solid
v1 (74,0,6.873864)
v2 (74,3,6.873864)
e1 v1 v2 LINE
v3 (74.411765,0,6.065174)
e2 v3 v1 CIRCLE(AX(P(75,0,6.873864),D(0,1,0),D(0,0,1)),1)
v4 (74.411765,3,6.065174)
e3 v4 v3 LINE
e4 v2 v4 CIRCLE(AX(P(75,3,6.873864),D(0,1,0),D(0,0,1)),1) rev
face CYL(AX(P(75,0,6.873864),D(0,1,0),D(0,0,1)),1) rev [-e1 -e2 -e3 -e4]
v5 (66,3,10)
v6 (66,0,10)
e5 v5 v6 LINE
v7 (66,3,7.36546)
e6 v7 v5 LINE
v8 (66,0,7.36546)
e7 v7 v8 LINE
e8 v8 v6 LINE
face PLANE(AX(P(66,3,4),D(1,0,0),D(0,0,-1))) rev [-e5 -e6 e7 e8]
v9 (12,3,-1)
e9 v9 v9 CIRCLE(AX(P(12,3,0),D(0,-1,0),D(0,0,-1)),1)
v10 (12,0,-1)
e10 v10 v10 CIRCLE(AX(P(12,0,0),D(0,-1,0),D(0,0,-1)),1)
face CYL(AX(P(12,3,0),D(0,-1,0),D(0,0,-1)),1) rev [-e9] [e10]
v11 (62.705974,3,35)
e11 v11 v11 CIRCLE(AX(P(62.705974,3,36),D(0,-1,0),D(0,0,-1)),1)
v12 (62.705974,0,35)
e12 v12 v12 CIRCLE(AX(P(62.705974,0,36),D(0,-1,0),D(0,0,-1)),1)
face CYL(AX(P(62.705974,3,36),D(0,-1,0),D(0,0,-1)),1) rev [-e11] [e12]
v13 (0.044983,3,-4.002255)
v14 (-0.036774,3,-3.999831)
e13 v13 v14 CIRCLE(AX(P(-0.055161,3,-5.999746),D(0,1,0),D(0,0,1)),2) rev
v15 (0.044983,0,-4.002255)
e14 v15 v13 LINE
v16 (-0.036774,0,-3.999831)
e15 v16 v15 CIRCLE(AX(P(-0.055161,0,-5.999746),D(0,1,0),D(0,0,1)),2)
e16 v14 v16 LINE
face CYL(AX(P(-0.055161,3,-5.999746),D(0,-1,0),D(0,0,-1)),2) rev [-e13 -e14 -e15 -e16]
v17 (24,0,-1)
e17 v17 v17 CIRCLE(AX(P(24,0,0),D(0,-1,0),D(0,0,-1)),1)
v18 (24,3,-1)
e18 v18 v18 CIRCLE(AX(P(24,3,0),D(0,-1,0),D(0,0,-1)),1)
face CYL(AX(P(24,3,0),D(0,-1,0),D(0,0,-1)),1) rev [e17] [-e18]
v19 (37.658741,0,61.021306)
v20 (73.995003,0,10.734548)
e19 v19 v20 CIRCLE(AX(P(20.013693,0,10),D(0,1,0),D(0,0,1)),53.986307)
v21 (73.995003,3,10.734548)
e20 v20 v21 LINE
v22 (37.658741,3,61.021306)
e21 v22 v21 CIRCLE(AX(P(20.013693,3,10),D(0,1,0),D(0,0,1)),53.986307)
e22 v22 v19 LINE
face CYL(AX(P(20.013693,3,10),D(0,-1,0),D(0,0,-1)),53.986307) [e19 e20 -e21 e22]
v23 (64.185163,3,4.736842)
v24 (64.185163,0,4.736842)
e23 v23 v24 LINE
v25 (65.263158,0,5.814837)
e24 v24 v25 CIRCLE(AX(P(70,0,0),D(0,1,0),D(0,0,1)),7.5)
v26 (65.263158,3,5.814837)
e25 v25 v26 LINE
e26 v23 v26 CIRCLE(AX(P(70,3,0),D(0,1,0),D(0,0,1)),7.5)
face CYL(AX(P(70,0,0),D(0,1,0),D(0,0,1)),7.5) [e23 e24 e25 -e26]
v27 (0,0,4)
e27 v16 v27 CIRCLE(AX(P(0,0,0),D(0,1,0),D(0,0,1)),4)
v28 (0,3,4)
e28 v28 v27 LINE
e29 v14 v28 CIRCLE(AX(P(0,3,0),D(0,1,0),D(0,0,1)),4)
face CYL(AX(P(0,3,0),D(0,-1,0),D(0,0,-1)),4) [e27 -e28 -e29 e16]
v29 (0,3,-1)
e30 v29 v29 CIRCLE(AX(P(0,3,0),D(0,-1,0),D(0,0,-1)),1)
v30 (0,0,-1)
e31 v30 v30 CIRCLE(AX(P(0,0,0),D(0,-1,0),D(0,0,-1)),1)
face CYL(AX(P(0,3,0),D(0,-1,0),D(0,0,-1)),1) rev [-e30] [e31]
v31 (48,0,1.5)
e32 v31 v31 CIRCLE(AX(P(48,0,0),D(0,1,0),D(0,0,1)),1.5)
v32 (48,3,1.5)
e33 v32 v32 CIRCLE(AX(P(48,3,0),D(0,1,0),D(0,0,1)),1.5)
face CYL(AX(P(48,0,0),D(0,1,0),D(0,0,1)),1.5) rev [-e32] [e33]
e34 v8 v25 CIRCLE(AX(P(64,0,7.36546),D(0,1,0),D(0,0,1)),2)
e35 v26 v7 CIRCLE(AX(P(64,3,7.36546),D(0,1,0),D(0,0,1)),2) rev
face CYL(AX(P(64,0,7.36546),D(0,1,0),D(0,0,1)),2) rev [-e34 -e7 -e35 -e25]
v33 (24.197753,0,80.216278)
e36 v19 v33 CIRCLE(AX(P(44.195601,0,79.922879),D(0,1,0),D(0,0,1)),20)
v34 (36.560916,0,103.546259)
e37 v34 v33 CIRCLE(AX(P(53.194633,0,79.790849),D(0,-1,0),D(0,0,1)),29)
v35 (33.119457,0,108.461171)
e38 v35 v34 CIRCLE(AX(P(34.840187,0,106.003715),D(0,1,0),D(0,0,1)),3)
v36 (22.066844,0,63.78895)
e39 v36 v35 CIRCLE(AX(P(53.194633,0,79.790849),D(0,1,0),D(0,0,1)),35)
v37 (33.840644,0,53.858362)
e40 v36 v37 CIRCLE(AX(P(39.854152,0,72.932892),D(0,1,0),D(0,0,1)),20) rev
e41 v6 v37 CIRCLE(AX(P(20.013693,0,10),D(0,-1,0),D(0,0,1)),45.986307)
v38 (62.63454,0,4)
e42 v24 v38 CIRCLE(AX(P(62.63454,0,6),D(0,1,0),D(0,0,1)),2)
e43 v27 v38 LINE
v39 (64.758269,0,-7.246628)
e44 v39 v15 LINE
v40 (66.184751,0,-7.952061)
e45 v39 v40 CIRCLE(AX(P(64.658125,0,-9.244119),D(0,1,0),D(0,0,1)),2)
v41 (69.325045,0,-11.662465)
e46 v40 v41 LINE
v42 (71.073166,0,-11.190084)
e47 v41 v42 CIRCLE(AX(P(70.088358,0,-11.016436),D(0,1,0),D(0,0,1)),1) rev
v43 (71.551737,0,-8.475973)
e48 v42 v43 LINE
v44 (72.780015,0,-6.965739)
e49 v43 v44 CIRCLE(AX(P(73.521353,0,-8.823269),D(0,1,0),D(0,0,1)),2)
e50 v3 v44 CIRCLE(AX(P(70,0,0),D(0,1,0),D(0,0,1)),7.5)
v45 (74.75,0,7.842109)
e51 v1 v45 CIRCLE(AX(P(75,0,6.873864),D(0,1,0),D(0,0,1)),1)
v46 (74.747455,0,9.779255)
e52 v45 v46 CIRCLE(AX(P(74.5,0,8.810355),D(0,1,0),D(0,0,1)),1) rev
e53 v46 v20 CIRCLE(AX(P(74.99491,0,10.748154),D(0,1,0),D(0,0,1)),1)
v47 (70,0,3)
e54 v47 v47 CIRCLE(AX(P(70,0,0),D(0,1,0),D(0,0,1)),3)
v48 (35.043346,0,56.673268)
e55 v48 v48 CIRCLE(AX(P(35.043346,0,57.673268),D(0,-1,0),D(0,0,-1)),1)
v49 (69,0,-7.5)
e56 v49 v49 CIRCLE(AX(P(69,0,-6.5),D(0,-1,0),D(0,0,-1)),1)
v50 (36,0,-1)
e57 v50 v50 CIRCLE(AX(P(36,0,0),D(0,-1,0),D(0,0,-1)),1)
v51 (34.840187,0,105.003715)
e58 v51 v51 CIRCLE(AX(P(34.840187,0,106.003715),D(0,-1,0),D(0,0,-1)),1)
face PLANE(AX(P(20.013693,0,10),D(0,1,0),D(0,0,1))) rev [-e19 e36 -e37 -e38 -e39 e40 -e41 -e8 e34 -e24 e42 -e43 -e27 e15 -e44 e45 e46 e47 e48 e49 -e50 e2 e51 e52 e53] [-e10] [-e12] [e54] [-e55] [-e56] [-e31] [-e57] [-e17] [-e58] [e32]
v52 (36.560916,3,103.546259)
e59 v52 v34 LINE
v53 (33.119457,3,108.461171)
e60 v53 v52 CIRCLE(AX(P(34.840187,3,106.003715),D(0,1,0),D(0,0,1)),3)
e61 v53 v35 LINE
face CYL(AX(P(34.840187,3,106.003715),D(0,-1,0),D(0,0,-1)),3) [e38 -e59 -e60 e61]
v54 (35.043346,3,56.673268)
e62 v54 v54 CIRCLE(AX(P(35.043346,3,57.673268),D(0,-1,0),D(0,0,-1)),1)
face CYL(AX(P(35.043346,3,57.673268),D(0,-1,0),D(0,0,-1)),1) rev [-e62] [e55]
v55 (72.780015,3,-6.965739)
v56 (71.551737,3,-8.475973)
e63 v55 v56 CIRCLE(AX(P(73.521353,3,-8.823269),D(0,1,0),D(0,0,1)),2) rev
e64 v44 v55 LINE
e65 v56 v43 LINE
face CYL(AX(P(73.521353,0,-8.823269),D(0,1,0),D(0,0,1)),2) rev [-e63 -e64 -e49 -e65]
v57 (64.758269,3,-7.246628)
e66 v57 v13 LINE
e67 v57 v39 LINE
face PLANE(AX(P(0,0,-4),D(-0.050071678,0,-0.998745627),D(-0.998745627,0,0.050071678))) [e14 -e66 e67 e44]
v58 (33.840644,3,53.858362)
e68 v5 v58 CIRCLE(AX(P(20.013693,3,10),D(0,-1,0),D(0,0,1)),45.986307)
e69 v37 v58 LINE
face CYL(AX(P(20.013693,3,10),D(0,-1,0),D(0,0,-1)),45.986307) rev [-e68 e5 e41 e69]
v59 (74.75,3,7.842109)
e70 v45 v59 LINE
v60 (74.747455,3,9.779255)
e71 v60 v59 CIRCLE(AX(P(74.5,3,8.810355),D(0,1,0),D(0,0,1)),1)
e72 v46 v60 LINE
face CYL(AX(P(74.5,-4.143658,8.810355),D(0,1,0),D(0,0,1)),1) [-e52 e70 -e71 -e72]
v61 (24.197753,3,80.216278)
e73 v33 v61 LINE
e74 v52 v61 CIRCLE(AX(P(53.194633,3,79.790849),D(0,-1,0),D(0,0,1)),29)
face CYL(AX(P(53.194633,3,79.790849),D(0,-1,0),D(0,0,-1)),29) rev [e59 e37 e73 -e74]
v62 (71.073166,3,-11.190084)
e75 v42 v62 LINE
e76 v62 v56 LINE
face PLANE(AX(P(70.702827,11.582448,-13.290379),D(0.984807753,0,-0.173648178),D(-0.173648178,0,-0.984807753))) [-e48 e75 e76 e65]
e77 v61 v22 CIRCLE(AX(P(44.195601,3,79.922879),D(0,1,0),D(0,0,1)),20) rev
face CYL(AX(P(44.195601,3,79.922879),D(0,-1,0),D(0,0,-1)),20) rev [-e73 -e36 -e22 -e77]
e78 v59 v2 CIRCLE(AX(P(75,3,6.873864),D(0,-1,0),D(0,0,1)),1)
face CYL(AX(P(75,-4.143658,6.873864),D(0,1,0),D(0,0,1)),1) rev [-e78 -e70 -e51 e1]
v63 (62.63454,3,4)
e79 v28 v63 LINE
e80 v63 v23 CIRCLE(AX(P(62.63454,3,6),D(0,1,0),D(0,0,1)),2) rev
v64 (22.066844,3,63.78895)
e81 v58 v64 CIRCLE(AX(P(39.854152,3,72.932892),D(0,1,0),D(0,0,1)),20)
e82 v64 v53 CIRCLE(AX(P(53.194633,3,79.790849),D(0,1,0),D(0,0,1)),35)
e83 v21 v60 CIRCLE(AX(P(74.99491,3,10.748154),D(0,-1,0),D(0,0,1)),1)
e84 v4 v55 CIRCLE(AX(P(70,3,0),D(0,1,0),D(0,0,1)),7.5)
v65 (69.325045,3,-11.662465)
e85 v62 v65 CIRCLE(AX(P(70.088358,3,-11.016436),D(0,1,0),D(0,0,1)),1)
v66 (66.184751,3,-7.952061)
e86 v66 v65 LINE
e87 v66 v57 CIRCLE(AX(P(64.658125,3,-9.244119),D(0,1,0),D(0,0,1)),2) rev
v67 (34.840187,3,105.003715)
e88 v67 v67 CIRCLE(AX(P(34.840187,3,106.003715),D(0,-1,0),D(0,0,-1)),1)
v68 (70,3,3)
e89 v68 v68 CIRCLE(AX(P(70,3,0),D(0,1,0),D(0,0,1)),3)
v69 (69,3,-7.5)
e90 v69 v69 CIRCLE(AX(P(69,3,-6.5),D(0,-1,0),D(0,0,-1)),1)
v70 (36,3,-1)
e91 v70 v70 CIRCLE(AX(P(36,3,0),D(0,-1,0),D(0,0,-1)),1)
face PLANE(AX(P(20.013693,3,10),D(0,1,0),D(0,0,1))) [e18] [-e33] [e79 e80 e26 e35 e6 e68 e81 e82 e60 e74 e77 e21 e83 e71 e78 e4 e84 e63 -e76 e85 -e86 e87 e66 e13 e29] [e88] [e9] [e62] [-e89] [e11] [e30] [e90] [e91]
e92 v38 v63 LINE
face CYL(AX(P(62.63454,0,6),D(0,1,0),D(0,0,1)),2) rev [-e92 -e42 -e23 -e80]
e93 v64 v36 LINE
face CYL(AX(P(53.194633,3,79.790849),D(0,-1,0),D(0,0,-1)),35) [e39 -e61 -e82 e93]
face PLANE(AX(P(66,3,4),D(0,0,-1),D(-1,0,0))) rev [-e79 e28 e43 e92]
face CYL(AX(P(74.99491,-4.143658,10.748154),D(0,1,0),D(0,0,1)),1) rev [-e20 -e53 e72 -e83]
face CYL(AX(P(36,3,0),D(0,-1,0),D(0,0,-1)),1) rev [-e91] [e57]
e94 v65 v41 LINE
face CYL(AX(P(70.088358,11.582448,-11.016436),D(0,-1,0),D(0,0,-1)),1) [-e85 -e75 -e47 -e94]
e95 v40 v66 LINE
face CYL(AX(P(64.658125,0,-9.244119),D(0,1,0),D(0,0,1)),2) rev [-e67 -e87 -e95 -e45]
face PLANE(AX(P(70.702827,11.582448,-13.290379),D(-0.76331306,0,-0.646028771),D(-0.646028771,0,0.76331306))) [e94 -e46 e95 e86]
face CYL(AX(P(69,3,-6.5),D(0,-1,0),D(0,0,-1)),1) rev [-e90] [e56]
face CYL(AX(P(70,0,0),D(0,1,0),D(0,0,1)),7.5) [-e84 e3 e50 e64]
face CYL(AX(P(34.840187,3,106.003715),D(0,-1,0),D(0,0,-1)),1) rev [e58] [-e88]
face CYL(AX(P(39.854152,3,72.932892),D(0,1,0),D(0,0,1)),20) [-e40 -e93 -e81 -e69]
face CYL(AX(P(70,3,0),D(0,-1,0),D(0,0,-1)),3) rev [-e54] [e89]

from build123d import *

# Parameters (mm, degrees)
SKETCH_1_R          = 3
EXTRUDE_1_DEPTH     = 3
EXTRUDE_START       = -3
SKETCH_2_R          = 3
EXTRUDE_2_DEPTH     = 3
EXTRUDE_4_DEPTH     = 3
FILLET_1_R          = 20
SKETCH_4_R          = 1
CUT_EXTRUDE_2_DEPTH = 134.77989332
SKETCH_5_R          = 1.5
CUT_EXTRUDE_3_DEPTH = 134.77989332
EXTRUDE_5_DEPTH     = 3
FILLET_2_R          = 2
FILLET_3_R          = 1


with BuildPart() as part:
    # 草图1 → 凸台-拉伸1 (new body)
    with BuildSketch(Plane(origin=(0, 0, 0), x_dir=(1, 0, 0), z_dir=(0, 1, 0))):
        with BuildLine():
            Line((0, 4), (70, 4))
            ThreePointArc((70, 4), (72.828427125, 2.828427125), (74, 0))
            Line((74, 0), (74, -10))
            ThreePointArc((74, -10), (61.386213612, -44.681924543), (29.439223407, -63.157132631))
            ThreePointArc((29.439223407, -63.157132631), (24.635207854, -84.826646437), (36.560916037, -103.546258569))
            ThreePointArc((36.560916037, -103.546258569), (37.297642861, -107.724444011), (33.119457419, -108.461170835))
            ThreePointArc((33.119457419, -108.461170835), (18.340459825, -82.982499926), (28.246224292, -55.243407089))
            ThreePointArc((28.246224292, -55.243407089), (55.321795077, -39.463169658), (66, -10))
            Line((66, -10), (66, -4))
            Line((66, -4), (0, -4))
            ThreePointArc((0, -4), (-4, 0), (0, 4))
        make_face()
        with Locations(Location((70, 0, 0), (0, 0, 270))):
            Circle(SKETCH_1_R, mode=Mode.SUBTRACT)
    extrude(amount=EXTRUDE_1_DEPTH)

    # 草图2 → 凸台-拉伸2 (add)
    with BuildSketch(Plane(origin=(0, 3, 0), x_dir=(1, 0, 0), z_dir=(0, 1, 0)).offset(EXTRUDE_START)):
        with BuildLine():
            Line((0, 4), (69.624462411, 7.490592201))
            ThreePointArc((69.624462411, 7.490592201), (73.786168915, -6.474173689), (63.65571123, 4))
            Line((63.65571123, 4), (0, 4))
        make_face()
        with Locations(Location((70, 0, 0), (0, 0, 270))):
            Circle(SKETCH_2_R, mode=Mode.SUBTRACT)
    extrude(amount=EXTRUDE_2_DEPTH)

    # 草图6 → 凸台-拉伸4 (add)
    with BuildSketch(Plane.XZ):
        with BuildLine():
            Line((70.702827497, -13.290378643), (71.760789381, -7.290378643))
            ThreePointArc((71.760789381, -7.290378643), (70.699822834, -7.467278487), (69.624462411, -7.490592201))
            Line((69.624462411, -7.490592201), (65.624462411, -7.290053937))
            Line((65.624462411, -7.290053937), (70.702827497, -13.290378643))
        make_face()
    extrude(amount=-EXTRUDE_4_DEPTH)

    # 圆角1
    fillet_1_edges = [part.edges().sort_by_distance(p)[0] for p in [
        (29.439223407, 1.5, 63.157132631),
        (28.246224292, 1.5, 55.243407089),
    ]]
    fillet(fillet_1_edges, radius=FILLET_1_R)

    # 草图4 → 切除-拉伸2 (cut, through all)
    with BuildSketch(Plane.XZ):
        with Locations(Location((62.705974414, 36, 0), (0, 0, 270))):
            Circle(SKETCH_4_R)
        with Locations(Location((34.840186728, 106.003714702, 0), (0, 0, 270))):
            Circle(SKETCH_4_R)
        with Locations(Location((0, 0, 0), (0, 0, 270))):
            Circle(SKETCH_4_R)
        with Locations(Location((69, -6.5, 0), (0, 0, 270))):
            Circle(SKETCH_4_R)
        with Locations(Location((12, 0, 0), (0, 0, 270))):
            Circle(SKETCH_4_R)
        with Locations(Location((24, 0, 0), (0, 0, 270))):
            Circle(SKETCH_4_R)
        with Locations(Location((36, 0, 0), (0, 0, 270))):
            Circle(SKETCH_4_R)
        with Locations(Location((35.04334559, 57.673267705, 0), (0, 0, 270))):
            Circle(SKETCH_4_R)
    extrude(amount=-CUT_EXTRUDE_2_DEPTH, mode=Mode.SUBTRACT)

    # 草图5 → 切除-拉伸3 (cut, through all)
    with BuildSketch(Plane(origin=(0, 3, 0), x_dir=(1, 0, 0), z_dir=(0, 1, 0))):
        with Locations(Location((48, 0, 0), (0, 0, 270))):
            Circle(SKETCH_5_R)
    extrude(amount=-CUT_EXTRUDE_3_DEPTH, mode=Mode.SUBTRACT)

    # 草图9 → 凸台-拉伸5 (add)
    with BuildSketch(Plane(origin=(0, 3, 0), x_dir=(1, 0, 0), z_dir=(0, 1, 0)).offset(EXTRUDE_START)):
        with BuildLine():
            Line((74, -10), (74, -6.873863542))
            ThreePointArc((74, -6.873863542), (74.209430585, -7.486235978), (74.75, -7.842109379))
            ThreePointArc((74.75, -7.842109379), (75.499999137, -8.811669003), (74.747455001, -9.779254603))
            ThreePointArc((74.747455001, -9.779254603), (74.20933726, -10.129384674), (73.995002571, -10.734547803))
            ThreePointArc((73.995002571, -10.734547803), (73.998750628, -10.367282401), (74, -10))
        make_face()
    extrude(amount=EXTRUDE_5_DEPTH)

    # 圆角2
    fillet_2_edges = [part.edges().sort_by_distance(p)[0] for p in [
        (0, 1.5, -4),
        (66, 1.5, 6.34428877),
        (63.65571123, 1.5, 4),
        (65.624462411, 1.5, -7.290053937),
        (71.760789381, 1.5, -7.290378643),
    ]]
    fillet(fillet_2_edges, radius=FILLET_2_R)

    # 圆角3
    fillet_3_edges = [part.edges().sort_by_distance(p)[0] for p in [
        (70.702827497, 1.5, -13.290378643),
        (74, 1.5, 6.34428877),
    ]]
    fillet(fillet_3_edges, radius=FILLET_3_R - 0.0001)  # a hair under: the kernel refuses the full size


solid = part.part
